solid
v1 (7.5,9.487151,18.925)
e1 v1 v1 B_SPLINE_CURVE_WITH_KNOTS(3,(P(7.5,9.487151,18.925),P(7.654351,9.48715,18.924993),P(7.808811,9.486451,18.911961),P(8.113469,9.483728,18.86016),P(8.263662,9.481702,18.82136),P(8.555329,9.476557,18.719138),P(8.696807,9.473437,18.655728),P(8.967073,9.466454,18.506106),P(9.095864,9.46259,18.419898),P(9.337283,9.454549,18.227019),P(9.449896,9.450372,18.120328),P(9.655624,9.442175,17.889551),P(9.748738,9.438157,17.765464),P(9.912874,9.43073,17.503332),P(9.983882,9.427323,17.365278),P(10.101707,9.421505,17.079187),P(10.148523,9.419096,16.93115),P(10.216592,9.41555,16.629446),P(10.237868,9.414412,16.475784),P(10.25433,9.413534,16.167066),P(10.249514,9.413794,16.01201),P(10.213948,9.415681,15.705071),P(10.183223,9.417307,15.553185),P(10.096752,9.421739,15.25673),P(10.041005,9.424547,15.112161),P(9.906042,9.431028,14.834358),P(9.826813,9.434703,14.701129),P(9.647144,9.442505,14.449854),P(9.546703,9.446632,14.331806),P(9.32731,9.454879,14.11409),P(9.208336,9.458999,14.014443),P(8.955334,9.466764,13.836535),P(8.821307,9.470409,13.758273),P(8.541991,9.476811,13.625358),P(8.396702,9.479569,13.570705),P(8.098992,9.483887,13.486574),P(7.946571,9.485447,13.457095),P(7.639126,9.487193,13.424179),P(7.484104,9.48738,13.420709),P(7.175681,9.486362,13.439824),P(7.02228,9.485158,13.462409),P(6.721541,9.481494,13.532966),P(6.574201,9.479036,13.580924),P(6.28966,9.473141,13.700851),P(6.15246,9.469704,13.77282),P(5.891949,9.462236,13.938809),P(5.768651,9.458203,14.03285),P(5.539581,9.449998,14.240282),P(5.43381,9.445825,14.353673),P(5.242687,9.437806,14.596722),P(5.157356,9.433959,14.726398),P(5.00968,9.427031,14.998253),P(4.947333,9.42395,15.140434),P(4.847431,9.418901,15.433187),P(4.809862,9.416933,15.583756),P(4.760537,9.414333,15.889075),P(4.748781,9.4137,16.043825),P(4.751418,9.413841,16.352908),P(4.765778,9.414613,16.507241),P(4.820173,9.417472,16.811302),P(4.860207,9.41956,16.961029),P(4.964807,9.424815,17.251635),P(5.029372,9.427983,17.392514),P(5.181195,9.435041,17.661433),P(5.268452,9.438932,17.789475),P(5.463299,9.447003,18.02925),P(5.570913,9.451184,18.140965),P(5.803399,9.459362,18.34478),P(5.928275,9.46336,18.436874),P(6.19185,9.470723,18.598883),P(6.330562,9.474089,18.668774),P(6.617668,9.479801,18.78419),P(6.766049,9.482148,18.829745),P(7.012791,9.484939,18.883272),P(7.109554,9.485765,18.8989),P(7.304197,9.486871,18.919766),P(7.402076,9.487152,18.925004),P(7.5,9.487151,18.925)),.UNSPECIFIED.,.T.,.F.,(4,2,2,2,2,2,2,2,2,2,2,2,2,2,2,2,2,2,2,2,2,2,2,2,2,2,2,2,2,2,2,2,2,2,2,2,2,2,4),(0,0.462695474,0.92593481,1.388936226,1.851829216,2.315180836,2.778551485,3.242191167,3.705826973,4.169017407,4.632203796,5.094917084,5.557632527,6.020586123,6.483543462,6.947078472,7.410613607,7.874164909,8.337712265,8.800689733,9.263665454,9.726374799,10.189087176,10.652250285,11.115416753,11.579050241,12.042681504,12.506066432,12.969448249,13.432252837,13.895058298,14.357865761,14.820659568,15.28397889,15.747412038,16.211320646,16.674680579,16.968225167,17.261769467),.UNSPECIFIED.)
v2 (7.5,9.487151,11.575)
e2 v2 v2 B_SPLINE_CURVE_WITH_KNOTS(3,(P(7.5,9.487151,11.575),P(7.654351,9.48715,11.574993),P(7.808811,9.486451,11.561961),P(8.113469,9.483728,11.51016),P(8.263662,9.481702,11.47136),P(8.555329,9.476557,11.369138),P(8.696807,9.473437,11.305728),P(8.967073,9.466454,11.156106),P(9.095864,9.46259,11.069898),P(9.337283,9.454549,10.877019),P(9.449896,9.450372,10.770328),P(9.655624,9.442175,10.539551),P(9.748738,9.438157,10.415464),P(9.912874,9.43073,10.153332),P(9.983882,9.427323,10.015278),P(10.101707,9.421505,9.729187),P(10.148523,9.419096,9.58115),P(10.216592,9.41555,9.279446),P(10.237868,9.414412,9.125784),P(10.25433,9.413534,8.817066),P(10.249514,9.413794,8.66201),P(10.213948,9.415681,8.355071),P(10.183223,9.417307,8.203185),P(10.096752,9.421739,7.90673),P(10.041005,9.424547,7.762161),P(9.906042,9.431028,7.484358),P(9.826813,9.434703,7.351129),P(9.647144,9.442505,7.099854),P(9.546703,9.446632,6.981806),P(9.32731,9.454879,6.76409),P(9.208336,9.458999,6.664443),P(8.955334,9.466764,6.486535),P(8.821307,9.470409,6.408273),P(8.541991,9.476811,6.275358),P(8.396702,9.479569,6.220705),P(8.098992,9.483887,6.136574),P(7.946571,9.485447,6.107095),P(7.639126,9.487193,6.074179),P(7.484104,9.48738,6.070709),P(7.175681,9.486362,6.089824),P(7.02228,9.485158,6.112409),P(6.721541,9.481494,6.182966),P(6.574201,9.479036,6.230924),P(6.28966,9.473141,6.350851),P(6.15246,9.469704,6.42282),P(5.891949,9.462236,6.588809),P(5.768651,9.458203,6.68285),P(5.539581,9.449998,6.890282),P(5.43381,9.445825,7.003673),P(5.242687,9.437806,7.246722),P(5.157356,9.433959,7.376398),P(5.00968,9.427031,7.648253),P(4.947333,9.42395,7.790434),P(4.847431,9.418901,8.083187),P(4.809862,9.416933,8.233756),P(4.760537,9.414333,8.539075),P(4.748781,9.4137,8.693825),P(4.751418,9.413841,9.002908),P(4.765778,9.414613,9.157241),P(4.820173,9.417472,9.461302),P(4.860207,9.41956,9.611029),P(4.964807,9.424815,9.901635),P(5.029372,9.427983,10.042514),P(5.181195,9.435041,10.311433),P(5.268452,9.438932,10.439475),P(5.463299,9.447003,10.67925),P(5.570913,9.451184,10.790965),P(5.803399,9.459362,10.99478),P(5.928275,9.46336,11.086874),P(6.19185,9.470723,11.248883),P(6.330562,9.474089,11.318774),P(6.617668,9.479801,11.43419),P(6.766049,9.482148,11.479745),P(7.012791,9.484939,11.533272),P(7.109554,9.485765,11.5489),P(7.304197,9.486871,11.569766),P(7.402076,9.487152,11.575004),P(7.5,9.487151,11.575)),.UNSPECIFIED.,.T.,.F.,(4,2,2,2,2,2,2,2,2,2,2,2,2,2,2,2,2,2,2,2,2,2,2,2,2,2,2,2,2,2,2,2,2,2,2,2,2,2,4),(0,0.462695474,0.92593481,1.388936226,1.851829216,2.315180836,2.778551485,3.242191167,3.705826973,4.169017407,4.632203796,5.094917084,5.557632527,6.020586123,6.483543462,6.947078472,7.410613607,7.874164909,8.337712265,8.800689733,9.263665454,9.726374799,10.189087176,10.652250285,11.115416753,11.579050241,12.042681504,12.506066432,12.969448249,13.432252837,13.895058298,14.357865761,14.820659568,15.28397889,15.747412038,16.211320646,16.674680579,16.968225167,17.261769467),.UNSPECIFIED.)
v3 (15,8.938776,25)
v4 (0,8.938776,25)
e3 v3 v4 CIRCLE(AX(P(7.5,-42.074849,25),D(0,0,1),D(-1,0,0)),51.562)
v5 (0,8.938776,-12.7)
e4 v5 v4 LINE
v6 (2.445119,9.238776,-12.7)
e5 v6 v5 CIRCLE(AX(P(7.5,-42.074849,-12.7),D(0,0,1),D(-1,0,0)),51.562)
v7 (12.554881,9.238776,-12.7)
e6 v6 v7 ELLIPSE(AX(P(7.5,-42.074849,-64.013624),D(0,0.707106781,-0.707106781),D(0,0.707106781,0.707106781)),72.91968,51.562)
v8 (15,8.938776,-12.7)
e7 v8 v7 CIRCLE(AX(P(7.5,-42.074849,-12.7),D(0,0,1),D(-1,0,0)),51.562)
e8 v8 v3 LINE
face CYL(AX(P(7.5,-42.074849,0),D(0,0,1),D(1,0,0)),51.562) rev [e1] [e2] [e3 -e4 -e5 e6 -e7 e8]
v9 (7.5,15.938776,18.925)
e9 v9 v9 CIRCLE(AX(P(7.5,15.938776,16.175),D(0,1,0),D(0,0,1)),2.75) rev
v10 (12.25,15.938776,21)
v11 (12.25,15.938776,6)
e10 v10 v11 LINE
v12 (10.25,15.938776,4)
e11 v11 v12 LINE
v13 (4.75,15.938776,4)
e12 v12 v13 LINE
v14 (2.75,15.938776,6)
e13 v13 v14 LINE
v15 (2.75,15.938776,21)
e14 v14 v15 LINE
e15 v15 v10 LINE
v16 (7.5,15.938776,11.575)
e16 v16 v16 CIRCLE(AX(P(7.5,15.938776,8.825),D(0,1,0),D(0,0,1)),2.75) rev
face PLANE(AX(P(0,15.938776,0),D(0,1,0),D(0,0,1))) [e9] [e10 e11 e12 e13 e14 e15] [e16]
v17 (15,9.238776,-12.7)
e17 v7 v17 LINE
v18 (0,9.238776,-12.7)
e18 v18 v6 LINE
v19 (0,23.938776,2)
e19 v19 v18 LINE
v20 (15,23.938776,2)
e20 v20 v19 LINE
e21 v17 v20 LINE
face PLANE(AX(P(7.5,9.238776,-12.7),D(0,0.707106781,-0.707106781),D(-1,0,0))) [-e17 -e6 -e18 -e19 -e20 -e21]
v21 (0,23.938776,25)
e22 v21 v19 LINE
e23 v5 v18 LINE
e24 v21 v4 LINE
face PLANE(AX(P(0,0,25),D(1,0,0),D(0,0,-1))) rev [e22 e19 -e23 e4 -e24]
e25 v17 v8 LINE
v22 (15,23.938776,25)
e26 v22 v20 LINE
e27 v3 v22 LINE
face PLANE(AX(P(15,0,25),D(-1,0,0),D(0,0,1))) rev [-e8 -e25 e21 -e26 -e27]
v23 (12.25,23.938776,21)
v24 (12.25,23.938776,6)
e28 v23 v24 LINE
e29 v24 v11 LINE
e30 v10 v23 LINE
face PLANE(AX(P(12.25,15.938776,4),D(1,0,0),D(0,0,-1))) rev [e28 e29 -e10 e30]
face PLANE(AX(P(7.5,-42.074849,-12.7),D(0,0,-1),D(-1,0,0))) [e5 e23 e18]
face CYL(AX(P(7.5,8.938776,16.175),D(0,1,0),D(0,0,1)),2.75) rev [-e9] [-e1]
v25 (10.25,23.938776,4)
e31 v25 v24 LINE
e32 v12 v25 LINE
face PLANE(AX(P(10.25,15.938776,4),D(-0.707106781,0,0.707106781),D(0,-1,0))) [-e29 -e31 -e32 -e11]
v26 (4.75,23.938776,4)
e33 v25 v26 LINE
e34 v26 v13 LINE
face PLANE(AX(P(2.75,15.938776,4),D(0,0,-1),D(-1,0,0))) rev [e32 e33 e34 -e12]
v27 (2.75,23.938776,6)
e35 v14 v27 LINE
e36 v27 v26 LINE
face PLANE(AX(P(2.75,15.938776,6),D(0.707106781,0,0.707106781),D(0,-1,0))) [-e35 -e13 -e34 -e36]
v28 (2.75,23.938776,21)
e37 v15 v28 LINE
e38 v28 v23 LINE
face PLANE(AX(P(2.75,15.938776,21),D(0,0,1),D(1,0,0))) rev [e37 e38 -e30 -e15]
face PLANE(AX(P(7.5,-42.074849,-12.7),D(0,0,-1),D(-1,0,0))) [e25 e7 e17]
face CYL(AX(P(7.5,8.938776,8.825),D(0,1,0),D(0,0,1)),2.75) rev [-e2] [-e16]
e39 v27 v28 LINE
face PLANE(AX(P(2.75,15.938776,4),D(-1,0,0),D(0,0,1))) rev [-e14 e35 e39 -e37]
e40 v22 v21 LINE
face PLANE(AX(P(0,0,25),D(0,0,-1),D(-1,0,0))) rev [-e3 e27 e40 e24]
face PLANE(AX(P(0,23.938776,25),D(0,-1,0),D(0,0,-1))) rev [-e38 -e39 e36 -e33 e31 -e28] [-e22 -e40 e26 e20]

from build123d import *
from build123d.topology import SkipClean

# Parameters (mm, degrees)
SKETCH1_W               = 15
SKETCH1_H               = 23.93877551
BOSS_EXTRUDE1_DEPTH     = 25
CUT_EXTRUDE1_DEPTH      = 25
CUT_EXTRUDE2_DEPTH      = 33.787192622
CUT_EXTRUDE2_DEPTH_BACK = 33.787192622
SKETCH3_R               = 2.75
SKETCH4_W               = 9.5
SKETCH4_H               = 17
CUT_EXTRUDE3_DEPTH      = 8
CHAMFER1_SIZE           = 2
BOSS_EXTRUDE2_DEPTH     = 12.7
CHAMFER2_START          = 15.513056934
CHAMFER2_OUTLINE_W      = 15
CHAMFER2_OUTLINE_H      = 24
CHAMFER2_DEPTH          = 11.486943066


with BuildPart() as part:
    # Sketch1 → Boss-Extrude1 (new body)
    with BuildSketch(Plane.XY):
        with Locations((7.5, 11.969387755)):
            Rectangle(SKETCH1_W, SKETCH1_H)
    extrude(amount=BOSS_EXTRUDE1_DEPTH)

    # Sketch2 → Cut-Extrude1 (cut)
    with BuildSketch(Plane.XY.offset(25)):
        with BuildLine():
            Line((0, 8.93877551), (0, 0))
            Line((0, 0), (15, 0))
            Line((15, 0), (15, 8.93877551))
            ThreePointArc((15, 8.93877551), (7.5, 9.487151408), (0, 8.93877551))
        make_face()
    extrude(amount=-CUT_EXTRUDE1_DEPTH, mode=Mode.SUBTRACT)

    # Sketch3 → Cut-Extrude2 (cut, two sides: drawn at the far end of the back side and taken through both)
    with BuildSketch(Plane(origin=(0, 23.93877551, 0), x_dir=(1, 0, 0), z_dir=(0, 1, 0)).offset(-CUT_EXTRUDE2_DEPTH_BACK)):
        with Locations(Location((7.5, -8.825, 0), (0, 0, 270))):
            Circle(SKETCH3_R)
        with Locations(Location((7.5, -16.175, 0), (0, 0, 270))):
            Circle(SKETCH3_R)
    extrude(amount=CUT_EXTRUDE2_DEPTH + CUT_EXTRUDE2_DEPTH_BACK, mode=Mode.SUBTRACT)

    # Sketch4 → Cut-Extrude3 (cut)
    with BuildSketch(Plane(origin=(0, 23.93877551, 0), x_dir=(1, 0, 0), z_dir=(0, 1, 0))):
        with Locations((7.5, -12.5)):
            Rectangle(SKETCH4_W, SKETCH4_H)
    extrude(amount=-CUT_EXTRUDE3_DEPTH, mode=Mode.SUBTRACT)

    # Chamfer1
    chamfer1_edges = [part.edges().sort_by_distance(p)[0] for p in [
        (2.75, 19.93877551, 4),
        (12.25, 19.93877551, 4),
    ]]
    chamfer(chamfer1_edges, length=CHAMFER1_SIZE)

    # Sketch5 → Boss-Extrude2 (add)
    with SkipClean():  # the faces are left unmerged after this step: merging them gives an invalid solid
        with BuildSketch(Plane(origin=(0, 0, 0), x_dir=(-1, 0, 0), z_dir=(0, 0, -1))):
            with BuildLine():
                Line((-15, 23.93877551), (0, 23.93877551))
                Line((0, 23.93877551), (0, 8.93877551))
                ThreePointArc((0, 8.93877551), (-7.5, 9.487151408), (-15, 8.93877551))
                Line((-15, 8.93877551), (-15, 23.93877551))
            make_face()
        extrude(amount=BOSS_EXTRUDE2_DEPTH)

    # Chamfer2: read off the stored shape, not the designer's step
    # Chamfer2 outline → Chamfer2 (cut)
    with BuildSketch(Plane(origin=(0, 0, 0), x_dir=(1, 0, 0), z_dir=(0, 0.707106781186544, -0.707106781186551)).offset(CHAMFER2_START)):
        with Locations((7.5, -8)):
            Rectangle(CHAMFER2_OUTLINE_W, CHAMFER2_OUTLINE_H)
    extrude(amount=CHAMFER2_DEPTH, mode=Mode.SUBTRACT)


solid = part.part
